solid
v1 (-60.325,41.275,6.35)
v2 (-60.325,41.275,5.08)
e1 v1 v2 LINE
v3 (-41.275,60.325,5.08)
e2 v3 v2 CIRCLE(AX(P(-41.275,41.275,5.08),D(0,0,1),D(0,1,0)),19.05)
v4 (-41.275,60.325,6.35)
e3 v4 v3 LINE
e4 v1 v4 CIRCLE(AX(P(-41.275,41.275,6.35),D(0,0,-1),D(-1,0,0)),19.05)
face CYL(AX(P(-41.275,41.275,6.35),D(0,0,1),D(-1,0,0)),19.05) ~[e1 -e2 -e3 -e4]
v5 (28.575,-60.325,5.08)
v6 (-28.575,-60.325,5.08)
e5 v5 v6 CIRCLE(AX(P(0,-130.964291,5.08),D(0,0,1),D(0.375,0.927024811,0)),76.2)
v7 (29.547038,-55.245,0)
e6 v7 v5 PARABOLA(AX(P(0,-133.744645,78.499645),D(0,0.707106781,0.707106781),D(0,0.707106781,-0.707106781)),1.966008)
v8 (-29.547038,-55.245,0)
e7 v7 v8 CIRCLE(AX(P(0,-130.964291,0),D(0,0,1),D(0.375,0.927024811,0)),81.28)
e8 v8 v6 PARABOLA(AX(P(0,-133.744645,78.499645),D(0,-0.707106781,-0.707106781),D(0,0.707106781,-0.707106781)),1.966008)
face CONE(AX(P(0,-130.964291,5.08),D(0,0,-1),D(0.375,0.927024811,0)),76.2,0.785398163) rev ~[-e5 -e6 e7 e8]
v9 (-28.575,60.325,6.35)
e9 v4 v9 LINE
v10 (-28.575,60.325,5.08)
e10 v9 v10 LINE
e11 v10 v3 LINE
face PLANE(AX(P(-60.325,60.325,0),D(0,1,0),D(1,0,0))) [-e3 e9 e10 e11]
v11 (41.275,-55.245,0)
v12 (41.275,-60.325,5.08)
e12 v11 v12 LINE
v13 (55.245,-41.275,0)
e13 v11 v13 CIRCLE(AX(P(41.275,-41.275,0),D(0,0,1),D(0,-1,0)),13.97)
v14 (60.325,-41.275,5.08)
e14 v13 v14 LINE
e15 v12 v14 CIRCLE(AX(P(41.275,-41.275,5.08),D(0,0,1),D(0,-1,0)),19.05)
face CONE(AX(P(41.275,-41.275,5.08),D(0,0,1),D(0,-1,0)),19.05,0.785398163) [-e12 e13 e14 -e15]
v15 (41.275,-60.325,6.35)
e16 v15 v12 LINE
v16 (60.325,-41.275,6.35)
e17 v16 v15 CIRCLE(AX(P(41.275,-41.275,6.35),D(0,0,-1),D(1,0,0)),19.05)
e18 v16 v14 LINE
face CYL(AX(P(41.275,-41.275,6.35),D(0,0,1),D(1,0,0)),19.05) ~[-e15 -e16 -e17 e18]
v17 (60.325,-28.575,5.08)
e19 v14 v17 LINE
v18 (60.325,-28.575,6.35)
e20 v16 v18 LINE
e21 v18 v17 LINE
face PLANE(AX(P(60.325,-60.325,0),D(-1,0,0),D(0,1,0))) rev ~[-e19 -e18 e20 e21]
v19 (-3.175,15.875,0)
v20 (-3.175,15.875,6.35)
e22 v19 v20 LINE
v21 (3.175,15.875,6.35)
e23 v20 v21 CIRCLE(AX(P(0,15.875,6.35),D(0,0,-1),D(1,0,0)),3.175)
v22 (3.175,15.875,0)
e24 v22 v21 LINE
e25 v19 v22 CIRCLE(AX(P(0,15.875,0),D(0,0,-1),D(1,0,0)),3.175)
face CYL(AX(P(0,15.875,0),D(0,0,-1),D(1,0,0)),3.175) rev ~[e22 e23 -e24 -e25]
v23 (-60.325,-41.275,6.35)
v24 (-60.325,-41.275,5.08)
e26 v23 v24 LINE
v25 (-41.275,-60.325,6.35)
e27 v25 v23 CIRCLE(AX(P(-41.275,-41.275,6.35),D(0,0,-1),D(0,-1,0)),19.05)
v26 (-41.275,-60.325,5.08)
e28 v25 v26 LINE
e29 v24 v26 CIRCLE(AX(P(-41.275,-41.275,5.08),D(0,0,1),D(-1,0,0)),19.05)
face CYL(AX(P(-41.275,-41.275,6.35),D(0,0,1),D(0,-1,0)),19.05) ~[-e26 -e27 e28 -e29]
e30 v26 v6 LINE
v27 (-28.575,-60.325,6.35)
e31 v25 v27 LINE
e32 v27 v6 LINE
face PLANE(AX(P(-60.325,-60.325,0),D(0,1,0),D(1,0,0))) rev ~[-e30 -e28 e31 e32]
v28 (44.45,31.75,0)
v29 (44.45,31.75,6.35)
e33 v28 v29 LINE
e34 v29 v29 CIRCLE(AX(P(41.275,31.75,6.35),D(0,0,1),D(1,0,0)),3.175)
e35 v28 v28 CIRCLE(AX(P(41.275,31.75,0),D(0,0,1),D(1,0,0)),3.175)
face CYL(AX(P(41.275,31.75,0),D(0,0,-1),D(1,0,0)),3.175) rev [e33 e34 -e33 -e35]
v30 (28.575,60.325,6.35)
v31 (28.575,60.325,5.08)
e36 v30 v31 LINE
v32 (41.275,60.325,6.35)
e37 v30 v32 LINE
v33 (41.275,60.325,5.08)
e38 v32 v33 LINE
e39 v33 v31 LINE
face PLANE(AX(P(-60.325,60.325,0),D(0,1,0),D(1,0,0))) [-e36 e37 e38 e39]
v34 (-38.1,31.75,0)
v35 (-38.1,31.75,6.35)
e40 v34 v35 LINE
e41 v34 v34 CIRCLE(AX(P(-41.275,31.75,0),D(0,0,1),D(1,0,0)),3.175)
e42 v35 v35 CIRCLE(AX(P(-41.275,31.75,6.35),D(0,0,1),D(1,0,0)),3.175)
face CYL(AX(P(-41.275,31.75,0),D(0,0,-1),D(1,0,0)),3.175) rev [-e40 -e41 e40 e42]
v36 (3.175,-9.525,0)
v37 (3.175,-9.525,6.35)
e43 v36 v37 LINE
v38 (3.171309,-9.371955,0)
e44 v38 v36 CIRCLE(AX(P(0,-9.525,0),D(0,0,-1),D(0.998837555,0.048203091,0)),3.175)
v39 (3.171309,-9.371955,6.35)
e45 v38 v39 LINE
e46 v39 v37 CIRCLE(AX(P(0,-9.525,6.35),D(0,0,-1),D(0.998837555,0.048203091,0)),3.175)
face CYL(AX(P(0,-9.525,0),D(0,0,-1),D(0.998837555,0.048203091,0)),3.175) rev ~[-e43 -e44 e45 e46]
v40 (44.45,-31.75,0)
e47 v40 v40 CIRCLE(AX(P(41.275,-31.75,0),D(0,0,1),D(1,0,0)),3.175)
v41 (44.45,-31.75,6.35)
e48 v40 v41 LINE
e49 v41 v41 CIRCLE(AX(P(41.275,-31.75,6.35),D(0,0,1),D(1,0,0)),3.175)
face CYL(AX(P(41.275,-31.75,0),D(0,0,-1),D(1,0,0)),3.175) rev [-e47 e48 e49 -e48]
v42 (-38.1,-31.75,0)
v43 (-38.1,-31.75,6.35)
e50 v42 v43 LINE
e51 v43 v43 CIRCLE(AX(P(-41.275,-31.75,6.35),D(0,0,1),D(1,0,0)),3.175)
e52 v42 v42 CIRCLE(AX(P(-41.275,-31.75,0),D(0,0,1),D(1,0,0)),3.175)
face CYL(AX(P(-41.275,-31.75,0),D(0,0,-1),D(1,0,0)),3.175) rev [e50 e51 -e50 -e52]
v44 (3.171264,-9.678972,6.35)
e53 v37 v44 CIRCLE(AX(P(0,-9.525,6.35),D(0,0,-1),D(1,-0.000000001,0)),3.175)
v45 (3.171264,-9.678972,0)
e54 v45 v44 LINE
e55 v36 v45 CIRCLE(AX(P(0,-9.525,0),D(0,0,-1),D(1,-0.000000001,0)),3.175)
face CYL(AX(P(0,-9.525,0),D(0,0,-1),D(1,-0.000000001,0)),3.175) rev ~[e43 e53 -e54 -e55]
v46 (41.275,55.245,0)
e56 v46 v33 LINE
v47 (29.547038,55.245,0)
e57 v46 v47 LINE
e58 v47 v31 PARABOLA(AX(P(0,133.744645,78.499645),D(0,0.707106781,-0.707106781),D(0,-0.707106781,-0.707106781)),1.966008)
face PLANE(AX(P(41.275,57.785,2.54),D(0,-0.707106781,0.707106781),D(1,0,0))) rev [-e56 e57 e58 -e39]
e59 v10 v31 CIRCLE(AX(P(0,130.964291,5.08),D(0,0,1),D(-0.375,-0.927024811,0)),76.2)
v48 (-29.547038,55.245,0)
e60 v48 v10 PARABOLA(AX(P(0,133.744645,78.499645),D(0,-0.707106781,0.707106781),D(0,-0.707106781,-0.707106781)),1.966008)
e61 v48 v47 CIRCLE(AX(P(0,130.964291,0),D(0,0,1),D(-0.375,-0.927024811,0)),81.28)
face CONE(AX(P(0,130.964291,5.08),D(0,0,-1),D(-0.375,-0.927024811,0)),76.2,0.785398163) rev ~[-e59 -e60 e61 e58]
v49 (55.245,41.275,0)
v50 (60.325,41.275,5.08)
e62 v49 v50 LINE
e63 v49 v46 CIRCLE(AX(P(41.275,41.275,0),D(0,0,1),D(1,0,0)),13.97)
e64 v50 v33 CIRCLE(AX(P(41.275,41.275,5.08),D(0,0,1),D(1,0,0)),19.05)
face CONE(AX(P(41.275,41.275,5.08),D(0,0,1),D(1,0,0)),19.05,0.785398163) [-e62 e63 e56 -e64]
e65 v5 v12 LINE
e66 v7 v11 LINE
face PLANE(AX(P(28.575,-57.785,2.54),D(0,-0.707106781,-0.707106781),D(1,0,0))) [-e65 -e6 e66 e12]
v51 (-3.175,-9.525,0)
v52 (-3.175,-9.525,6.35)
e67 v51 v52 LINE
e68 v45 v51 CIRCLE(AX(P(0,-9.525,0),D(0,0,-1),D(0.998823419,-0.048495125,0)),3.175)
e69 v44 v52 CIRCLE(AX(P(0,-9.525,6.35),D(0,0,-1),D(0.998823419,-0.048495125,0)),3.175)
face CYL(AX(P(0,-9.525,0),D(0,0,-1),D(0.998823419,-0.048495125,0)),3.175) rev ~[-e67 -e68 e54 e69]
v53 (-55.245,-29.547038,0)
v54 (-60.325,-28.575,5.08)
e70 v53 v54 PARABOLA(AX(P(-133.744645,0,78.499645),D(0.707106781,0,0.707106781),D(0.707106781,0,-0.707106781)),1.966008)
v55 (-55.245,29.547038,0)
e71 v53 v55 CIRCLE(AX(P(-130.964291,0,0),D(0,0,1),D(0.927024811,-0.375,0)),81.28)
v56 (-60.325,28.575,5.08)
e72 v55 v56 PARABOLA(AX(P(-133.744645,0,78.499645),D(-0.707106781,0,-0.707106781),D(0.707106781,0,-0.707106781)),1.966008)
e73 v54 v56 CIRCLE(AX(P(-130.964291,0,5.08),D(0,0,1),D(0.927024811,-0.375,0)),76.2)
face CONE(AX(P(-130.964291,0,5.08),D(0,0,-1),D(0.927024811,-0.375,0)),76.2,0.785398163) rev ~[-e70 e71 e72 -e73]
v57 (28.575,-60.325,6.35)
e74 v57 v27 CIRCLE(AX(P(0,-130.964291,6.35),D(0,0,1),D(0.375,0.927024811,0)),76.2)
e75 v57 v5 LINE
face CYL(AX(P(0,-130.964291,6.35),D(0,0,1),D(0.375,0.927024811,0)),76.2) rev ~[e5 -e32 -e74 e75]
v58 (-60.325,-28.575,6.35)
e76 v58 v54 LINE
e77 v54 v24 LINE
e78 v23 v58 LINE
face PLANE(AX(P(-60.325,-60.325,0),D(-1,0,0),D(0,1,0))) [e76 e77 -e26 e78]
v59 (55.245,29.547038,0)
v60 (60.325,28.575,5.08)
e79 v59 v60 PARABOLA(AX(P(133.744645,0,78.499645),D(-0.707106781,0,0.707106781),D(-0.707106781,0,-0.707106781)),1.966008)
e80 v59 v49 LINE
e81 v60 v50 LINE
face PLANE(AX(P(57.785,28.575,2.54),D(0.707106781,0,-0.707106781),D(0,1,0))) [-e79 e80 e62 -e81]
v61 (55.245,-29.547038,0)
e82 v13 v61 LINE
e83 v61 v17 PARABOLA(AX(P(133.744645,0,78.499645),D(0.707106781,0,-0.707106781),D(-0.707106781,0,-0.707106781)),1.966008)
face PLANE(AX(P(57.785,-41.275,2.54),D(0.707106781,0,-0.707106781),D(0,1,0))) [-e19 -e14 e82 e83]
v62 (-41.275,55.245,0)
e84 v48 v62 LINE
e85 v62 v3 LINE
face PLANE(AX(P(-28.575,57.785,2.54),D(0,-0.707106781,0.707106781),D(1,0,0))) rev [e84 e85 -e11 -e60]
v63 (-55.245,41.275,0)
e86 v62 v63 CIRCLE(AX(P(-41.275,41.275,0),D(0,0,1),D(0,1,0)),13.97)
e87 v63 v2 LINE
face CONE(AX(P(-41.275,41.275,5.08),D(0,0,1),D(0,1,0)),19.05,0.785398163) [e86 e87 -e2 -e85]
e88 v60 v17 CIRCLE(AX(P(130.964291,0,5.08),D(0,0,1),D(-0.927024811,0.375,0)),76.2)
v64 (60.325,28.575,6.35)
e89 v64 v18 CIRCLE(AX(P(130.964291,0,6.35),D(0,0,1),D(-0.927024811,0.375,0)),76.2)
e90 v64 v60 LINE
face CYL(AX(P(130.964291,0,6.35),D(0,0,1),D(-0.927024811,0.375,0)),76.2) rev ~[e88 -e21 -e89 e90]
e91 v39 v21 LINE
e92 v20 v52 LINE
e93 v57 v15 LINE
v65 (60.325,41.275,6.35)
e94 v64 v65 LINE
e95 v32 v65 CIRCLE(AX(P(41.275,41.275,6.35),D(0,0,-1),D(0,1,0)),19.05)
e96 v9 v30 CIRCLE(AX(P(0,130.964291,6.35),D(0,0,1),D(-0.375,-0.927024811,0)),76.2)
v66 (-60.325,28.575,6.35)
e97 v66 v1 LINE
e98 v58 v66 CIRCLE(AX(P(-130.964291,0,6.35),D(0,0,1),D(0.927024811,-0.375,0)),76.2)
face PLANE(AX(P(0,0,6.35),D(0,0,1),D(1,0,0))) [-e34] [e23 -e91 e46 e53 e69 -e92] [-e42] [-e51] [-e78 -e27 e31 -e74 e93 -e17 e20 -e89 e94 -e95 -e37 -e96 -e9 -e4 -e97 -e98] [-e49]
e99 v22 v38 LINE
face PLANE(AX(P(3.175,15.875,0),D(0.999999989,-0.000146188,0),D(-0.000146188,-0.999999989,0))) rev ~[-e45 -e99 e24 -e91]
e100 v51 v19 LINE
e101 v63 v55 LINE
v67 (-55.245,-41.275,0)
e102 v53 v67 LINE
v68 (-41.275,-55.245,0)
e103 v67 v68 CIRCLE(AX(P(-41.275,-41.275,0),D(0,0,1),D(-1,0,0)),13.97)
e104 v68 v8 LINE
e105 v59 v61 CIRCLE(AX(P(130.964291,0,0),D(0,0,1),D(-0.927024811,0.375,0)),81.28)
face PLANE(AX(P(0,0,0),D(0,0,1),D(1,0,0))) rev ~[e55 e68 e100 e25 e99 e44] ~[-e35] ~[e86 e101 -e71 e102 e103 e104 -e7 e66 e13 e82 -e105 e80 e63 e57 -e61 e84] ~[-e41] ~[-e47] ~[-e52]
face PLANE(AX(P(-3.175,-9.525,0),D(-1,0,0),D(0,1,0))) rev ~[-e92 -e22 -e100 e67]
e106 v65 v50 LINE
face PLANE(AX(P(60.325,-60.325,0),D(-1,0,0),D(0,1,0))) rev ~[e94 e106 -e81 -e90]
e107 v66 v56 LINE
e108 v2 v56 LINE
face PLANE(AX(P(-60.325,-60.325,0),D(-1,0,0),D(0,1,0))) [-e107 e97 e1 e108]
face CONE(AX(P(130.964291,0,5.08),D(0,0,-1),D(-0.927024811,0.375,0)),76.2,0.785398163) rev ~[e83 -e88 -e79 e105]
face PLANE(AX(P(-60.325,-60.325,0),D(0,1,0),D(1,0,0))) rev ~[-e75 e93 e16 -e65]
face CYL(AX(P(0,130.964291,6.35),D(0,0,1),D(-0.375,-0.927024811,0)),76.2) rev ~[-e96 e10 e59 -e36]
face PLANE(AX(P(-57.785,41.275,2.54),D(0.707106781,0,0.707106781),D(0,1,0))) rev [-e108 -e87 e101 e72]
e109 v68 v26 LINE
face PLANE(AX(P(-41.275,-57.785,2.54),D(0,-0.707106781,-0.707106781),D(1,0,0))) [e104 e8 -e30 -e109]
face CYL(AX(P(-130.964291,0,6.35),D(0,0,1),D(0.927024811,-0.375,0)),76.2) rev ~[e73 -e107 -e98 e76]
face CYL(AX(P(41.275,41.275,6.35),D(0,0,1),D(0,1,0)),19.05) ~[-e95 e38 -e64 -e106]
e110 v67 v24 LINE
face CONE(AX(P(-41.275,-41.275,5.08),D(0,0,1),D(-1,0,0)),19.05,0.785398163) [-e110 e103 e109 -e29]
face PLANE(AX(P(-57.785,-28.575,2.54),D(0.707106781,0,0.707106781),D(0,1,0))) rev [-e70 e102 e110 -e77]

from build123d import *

# Parameters (mm, degrees)
F0_W     = 120.65
F0_H     = 120.65
F0_R     = 3.175
F1_DEPTH = 6.35
F4_DEPTH = 25.4
F5_R     = 3.175
F6_DEPTH = 25.4
F7_SIZE  = 5.08


# Not quite as in the source:
# - a feature of the source that left no trace in its solid (it failed there, or was rolled back) is left out


with BuildPart() as f1:
    # F0 (on Top) → F1 (new body)
    with BuildSketch(Plane.XY):
        Rectangle(F0_W, F0_H)
        with Locations((-41.275, -31.75)):
            Circle(F0_R, mode=Mode.SUBTRACT)
        with Locations((41.275, -31.75)):
            Circle(F0_R, mode=Mode.SUBTRACT)
        with Locations((-41.275, 31.75)):
            Circle(F0_R, mode=Mode.SUBTRACT)
        with Locations((41.275, 31.75)):
            Circle(F0_R, mode=Mode.SUBTRACT)
    extrude(amount=F1_DEPTH)

    # F2 (on face) → F4 (cut)
    with BuildSketch(Plane(origin=(0, 0, 0), x_dir=(1, 0, 0), z_dir=(0, 0, -1))):
        with BuildLine():
            ThreePointArc((-3.175, -15.875), (0, -19.05), (3.175, -15.875))
            ThreePointArc((3.175, -15.875), (0, -12.7), (-3.175, -15.875))
        make_face()
        with BuildLine():
            ThreePointArc((-3.175, -15.875), (0, -12.7), (3.175, -15.875))
            Line((3.1750000339, -15.875), (3.1713092382, 9.3719551838))
            ThreePointArc((3.1713092382, 9.3719551838), (-0.0765446561, 6.3509228246), (-3.175, 9.525))
            Line((-3.175, 9.525), (-3.175, -15.875))
        make_face()
        with BuildLine():
            Line((3.1712643561, 9.6789720229), (3.1713092382, 9.3719551838))
            ThreePointArc((3.1713092382, 9.3719551838), (3.1740771754, 9.4484553439), (3.175, 9.525))
            ThreePointArc((3.175, 9.525), (3.1740659516, 9.6020086665), (3.1712643561, 9.6789720229))
        make_face()
        with BuildLine():
            ThreePointArc((-3.175, 9.525), (-0.0765446561, 6.3509228246), (3.1713092382, 9.3719551838))
            Line((3.1713092382, 9.3719551838), (3.1712643561, 9.6789720229))
            ThreePointArc((3.1712643561, 9.6789720229), (-0.0770086665, 12.6990659516), (-3.175, 9.525))
        make_face()
    extrude(amount=-F4_DEPTH, mode=Mode.SUBTRACT)

    # F5 (on face) → F6 (cut)
    with BuildSketch(Plane.XY.offset(6.35)):
        with BuildLine():
            ThreePointArc((-28.575, 60.325), (0, 54.7642905896), (28.575, 60.325))
            Line((28.575, 60.325), (-28.575, 60.325))
        make_face()
        with BuildLine():
            Line((-28.575, -60.325), (28.575, -60.325))
            ThreePointArc((28.575, -60.325), (0, -54.7642905896), (-28.575, -60.325))
        make_face()
        with BuildLine():
            Line((60.325, -28.575), (60.325, 28.575))
            ThreePointArc((60.325, 28.575), (54.7642905896, 0), (60.325, -28.575))
        make_face()
        with BuildLine():
            ThreePointArc((-60.325, -28.575), (-54.7642905896, 0), (-60.325, 28.575))
            Line((-60.325, 28.575), (-60.325, -28.575))
        make_face()
        with Locations((41.275, 31.75)):
            Circle(F5_R)
        with Locations((41.275, -31.75)):
            Circle(F5_R)
        with Locations((-41.275, -31.75)):
            Circle(F5_R)
        with Locations((-41.275, 31.75)):
            Circle(F5_R)
        with BuildLine():
            Line((60.325, 60.325), (41.275, 60.325))
            ThreePointArc((41.275, 60.325), (54.7453841816, 54.7453841816), (60.325, 41.275))
            Line((60.325, 41.275), (60.325, 60.325))
        make_face()
        with BuildLine():
            ThreePointArc((-41.275, -60.325), (-54.7453841816, -54.7453841816), (-60.325, -41.275))
            Line((-60.325, -41.275), (-60.325, -60.325))
            Line((-60.325, -60.325), (-41.275, -60.325))
        make_face()
        with BuildLine():
            ThreePointArc((-60.325, 41.275), (-54.7453841816, 54.7453841816), (-41.275, 60.325))
            Line((-41.275, 60.325), (-60.325, 60.325))
            Line((-60.325, 60.325), (-60.325, 41.275))
        make_face()
        with BuildLine():
            Line((60.325, -60.325), (60.325, -41.275))
            ThreePointArc((60.325, -41.275), (54.7453841816, -54.7453841816), (41.275, -60.325))
            Line((41.275, -60.325), (60.325, -60.325))
        make_face()
    extrude(amount=-F6_DEPTH, mode=Mode.SUBTRACT)

    # F7
    f7_edges = [f1.edges().sort_by_distance(p)[0] for p in [
        (0, 54.764291, 0),
        (54.745384, 54.745384, 0),
        (54.764291, 0, 0),
        (54.745384, -54.745384, 0),
        (-34.925, -60.325, 0),
        (0, -54.764291, 0),
        (-54.745384, 54.745384, 0),
        (-60.325, 34.925, 0),
        (-54.764291, 0, 0),
        (-54.745384, -54.745384, 0),
        (-60.325, -34.925, 0),
        (-34.925, 60.325, 0),
        (34.925, 60.325, 0),
        (60.325, 34.925, 0),
        (60.325, -34.925, 0),
        (34.925, -60.325, 0),
    ]]
    chamfer(f7_edges, length=F7_SIZE)


solid = f1.part
